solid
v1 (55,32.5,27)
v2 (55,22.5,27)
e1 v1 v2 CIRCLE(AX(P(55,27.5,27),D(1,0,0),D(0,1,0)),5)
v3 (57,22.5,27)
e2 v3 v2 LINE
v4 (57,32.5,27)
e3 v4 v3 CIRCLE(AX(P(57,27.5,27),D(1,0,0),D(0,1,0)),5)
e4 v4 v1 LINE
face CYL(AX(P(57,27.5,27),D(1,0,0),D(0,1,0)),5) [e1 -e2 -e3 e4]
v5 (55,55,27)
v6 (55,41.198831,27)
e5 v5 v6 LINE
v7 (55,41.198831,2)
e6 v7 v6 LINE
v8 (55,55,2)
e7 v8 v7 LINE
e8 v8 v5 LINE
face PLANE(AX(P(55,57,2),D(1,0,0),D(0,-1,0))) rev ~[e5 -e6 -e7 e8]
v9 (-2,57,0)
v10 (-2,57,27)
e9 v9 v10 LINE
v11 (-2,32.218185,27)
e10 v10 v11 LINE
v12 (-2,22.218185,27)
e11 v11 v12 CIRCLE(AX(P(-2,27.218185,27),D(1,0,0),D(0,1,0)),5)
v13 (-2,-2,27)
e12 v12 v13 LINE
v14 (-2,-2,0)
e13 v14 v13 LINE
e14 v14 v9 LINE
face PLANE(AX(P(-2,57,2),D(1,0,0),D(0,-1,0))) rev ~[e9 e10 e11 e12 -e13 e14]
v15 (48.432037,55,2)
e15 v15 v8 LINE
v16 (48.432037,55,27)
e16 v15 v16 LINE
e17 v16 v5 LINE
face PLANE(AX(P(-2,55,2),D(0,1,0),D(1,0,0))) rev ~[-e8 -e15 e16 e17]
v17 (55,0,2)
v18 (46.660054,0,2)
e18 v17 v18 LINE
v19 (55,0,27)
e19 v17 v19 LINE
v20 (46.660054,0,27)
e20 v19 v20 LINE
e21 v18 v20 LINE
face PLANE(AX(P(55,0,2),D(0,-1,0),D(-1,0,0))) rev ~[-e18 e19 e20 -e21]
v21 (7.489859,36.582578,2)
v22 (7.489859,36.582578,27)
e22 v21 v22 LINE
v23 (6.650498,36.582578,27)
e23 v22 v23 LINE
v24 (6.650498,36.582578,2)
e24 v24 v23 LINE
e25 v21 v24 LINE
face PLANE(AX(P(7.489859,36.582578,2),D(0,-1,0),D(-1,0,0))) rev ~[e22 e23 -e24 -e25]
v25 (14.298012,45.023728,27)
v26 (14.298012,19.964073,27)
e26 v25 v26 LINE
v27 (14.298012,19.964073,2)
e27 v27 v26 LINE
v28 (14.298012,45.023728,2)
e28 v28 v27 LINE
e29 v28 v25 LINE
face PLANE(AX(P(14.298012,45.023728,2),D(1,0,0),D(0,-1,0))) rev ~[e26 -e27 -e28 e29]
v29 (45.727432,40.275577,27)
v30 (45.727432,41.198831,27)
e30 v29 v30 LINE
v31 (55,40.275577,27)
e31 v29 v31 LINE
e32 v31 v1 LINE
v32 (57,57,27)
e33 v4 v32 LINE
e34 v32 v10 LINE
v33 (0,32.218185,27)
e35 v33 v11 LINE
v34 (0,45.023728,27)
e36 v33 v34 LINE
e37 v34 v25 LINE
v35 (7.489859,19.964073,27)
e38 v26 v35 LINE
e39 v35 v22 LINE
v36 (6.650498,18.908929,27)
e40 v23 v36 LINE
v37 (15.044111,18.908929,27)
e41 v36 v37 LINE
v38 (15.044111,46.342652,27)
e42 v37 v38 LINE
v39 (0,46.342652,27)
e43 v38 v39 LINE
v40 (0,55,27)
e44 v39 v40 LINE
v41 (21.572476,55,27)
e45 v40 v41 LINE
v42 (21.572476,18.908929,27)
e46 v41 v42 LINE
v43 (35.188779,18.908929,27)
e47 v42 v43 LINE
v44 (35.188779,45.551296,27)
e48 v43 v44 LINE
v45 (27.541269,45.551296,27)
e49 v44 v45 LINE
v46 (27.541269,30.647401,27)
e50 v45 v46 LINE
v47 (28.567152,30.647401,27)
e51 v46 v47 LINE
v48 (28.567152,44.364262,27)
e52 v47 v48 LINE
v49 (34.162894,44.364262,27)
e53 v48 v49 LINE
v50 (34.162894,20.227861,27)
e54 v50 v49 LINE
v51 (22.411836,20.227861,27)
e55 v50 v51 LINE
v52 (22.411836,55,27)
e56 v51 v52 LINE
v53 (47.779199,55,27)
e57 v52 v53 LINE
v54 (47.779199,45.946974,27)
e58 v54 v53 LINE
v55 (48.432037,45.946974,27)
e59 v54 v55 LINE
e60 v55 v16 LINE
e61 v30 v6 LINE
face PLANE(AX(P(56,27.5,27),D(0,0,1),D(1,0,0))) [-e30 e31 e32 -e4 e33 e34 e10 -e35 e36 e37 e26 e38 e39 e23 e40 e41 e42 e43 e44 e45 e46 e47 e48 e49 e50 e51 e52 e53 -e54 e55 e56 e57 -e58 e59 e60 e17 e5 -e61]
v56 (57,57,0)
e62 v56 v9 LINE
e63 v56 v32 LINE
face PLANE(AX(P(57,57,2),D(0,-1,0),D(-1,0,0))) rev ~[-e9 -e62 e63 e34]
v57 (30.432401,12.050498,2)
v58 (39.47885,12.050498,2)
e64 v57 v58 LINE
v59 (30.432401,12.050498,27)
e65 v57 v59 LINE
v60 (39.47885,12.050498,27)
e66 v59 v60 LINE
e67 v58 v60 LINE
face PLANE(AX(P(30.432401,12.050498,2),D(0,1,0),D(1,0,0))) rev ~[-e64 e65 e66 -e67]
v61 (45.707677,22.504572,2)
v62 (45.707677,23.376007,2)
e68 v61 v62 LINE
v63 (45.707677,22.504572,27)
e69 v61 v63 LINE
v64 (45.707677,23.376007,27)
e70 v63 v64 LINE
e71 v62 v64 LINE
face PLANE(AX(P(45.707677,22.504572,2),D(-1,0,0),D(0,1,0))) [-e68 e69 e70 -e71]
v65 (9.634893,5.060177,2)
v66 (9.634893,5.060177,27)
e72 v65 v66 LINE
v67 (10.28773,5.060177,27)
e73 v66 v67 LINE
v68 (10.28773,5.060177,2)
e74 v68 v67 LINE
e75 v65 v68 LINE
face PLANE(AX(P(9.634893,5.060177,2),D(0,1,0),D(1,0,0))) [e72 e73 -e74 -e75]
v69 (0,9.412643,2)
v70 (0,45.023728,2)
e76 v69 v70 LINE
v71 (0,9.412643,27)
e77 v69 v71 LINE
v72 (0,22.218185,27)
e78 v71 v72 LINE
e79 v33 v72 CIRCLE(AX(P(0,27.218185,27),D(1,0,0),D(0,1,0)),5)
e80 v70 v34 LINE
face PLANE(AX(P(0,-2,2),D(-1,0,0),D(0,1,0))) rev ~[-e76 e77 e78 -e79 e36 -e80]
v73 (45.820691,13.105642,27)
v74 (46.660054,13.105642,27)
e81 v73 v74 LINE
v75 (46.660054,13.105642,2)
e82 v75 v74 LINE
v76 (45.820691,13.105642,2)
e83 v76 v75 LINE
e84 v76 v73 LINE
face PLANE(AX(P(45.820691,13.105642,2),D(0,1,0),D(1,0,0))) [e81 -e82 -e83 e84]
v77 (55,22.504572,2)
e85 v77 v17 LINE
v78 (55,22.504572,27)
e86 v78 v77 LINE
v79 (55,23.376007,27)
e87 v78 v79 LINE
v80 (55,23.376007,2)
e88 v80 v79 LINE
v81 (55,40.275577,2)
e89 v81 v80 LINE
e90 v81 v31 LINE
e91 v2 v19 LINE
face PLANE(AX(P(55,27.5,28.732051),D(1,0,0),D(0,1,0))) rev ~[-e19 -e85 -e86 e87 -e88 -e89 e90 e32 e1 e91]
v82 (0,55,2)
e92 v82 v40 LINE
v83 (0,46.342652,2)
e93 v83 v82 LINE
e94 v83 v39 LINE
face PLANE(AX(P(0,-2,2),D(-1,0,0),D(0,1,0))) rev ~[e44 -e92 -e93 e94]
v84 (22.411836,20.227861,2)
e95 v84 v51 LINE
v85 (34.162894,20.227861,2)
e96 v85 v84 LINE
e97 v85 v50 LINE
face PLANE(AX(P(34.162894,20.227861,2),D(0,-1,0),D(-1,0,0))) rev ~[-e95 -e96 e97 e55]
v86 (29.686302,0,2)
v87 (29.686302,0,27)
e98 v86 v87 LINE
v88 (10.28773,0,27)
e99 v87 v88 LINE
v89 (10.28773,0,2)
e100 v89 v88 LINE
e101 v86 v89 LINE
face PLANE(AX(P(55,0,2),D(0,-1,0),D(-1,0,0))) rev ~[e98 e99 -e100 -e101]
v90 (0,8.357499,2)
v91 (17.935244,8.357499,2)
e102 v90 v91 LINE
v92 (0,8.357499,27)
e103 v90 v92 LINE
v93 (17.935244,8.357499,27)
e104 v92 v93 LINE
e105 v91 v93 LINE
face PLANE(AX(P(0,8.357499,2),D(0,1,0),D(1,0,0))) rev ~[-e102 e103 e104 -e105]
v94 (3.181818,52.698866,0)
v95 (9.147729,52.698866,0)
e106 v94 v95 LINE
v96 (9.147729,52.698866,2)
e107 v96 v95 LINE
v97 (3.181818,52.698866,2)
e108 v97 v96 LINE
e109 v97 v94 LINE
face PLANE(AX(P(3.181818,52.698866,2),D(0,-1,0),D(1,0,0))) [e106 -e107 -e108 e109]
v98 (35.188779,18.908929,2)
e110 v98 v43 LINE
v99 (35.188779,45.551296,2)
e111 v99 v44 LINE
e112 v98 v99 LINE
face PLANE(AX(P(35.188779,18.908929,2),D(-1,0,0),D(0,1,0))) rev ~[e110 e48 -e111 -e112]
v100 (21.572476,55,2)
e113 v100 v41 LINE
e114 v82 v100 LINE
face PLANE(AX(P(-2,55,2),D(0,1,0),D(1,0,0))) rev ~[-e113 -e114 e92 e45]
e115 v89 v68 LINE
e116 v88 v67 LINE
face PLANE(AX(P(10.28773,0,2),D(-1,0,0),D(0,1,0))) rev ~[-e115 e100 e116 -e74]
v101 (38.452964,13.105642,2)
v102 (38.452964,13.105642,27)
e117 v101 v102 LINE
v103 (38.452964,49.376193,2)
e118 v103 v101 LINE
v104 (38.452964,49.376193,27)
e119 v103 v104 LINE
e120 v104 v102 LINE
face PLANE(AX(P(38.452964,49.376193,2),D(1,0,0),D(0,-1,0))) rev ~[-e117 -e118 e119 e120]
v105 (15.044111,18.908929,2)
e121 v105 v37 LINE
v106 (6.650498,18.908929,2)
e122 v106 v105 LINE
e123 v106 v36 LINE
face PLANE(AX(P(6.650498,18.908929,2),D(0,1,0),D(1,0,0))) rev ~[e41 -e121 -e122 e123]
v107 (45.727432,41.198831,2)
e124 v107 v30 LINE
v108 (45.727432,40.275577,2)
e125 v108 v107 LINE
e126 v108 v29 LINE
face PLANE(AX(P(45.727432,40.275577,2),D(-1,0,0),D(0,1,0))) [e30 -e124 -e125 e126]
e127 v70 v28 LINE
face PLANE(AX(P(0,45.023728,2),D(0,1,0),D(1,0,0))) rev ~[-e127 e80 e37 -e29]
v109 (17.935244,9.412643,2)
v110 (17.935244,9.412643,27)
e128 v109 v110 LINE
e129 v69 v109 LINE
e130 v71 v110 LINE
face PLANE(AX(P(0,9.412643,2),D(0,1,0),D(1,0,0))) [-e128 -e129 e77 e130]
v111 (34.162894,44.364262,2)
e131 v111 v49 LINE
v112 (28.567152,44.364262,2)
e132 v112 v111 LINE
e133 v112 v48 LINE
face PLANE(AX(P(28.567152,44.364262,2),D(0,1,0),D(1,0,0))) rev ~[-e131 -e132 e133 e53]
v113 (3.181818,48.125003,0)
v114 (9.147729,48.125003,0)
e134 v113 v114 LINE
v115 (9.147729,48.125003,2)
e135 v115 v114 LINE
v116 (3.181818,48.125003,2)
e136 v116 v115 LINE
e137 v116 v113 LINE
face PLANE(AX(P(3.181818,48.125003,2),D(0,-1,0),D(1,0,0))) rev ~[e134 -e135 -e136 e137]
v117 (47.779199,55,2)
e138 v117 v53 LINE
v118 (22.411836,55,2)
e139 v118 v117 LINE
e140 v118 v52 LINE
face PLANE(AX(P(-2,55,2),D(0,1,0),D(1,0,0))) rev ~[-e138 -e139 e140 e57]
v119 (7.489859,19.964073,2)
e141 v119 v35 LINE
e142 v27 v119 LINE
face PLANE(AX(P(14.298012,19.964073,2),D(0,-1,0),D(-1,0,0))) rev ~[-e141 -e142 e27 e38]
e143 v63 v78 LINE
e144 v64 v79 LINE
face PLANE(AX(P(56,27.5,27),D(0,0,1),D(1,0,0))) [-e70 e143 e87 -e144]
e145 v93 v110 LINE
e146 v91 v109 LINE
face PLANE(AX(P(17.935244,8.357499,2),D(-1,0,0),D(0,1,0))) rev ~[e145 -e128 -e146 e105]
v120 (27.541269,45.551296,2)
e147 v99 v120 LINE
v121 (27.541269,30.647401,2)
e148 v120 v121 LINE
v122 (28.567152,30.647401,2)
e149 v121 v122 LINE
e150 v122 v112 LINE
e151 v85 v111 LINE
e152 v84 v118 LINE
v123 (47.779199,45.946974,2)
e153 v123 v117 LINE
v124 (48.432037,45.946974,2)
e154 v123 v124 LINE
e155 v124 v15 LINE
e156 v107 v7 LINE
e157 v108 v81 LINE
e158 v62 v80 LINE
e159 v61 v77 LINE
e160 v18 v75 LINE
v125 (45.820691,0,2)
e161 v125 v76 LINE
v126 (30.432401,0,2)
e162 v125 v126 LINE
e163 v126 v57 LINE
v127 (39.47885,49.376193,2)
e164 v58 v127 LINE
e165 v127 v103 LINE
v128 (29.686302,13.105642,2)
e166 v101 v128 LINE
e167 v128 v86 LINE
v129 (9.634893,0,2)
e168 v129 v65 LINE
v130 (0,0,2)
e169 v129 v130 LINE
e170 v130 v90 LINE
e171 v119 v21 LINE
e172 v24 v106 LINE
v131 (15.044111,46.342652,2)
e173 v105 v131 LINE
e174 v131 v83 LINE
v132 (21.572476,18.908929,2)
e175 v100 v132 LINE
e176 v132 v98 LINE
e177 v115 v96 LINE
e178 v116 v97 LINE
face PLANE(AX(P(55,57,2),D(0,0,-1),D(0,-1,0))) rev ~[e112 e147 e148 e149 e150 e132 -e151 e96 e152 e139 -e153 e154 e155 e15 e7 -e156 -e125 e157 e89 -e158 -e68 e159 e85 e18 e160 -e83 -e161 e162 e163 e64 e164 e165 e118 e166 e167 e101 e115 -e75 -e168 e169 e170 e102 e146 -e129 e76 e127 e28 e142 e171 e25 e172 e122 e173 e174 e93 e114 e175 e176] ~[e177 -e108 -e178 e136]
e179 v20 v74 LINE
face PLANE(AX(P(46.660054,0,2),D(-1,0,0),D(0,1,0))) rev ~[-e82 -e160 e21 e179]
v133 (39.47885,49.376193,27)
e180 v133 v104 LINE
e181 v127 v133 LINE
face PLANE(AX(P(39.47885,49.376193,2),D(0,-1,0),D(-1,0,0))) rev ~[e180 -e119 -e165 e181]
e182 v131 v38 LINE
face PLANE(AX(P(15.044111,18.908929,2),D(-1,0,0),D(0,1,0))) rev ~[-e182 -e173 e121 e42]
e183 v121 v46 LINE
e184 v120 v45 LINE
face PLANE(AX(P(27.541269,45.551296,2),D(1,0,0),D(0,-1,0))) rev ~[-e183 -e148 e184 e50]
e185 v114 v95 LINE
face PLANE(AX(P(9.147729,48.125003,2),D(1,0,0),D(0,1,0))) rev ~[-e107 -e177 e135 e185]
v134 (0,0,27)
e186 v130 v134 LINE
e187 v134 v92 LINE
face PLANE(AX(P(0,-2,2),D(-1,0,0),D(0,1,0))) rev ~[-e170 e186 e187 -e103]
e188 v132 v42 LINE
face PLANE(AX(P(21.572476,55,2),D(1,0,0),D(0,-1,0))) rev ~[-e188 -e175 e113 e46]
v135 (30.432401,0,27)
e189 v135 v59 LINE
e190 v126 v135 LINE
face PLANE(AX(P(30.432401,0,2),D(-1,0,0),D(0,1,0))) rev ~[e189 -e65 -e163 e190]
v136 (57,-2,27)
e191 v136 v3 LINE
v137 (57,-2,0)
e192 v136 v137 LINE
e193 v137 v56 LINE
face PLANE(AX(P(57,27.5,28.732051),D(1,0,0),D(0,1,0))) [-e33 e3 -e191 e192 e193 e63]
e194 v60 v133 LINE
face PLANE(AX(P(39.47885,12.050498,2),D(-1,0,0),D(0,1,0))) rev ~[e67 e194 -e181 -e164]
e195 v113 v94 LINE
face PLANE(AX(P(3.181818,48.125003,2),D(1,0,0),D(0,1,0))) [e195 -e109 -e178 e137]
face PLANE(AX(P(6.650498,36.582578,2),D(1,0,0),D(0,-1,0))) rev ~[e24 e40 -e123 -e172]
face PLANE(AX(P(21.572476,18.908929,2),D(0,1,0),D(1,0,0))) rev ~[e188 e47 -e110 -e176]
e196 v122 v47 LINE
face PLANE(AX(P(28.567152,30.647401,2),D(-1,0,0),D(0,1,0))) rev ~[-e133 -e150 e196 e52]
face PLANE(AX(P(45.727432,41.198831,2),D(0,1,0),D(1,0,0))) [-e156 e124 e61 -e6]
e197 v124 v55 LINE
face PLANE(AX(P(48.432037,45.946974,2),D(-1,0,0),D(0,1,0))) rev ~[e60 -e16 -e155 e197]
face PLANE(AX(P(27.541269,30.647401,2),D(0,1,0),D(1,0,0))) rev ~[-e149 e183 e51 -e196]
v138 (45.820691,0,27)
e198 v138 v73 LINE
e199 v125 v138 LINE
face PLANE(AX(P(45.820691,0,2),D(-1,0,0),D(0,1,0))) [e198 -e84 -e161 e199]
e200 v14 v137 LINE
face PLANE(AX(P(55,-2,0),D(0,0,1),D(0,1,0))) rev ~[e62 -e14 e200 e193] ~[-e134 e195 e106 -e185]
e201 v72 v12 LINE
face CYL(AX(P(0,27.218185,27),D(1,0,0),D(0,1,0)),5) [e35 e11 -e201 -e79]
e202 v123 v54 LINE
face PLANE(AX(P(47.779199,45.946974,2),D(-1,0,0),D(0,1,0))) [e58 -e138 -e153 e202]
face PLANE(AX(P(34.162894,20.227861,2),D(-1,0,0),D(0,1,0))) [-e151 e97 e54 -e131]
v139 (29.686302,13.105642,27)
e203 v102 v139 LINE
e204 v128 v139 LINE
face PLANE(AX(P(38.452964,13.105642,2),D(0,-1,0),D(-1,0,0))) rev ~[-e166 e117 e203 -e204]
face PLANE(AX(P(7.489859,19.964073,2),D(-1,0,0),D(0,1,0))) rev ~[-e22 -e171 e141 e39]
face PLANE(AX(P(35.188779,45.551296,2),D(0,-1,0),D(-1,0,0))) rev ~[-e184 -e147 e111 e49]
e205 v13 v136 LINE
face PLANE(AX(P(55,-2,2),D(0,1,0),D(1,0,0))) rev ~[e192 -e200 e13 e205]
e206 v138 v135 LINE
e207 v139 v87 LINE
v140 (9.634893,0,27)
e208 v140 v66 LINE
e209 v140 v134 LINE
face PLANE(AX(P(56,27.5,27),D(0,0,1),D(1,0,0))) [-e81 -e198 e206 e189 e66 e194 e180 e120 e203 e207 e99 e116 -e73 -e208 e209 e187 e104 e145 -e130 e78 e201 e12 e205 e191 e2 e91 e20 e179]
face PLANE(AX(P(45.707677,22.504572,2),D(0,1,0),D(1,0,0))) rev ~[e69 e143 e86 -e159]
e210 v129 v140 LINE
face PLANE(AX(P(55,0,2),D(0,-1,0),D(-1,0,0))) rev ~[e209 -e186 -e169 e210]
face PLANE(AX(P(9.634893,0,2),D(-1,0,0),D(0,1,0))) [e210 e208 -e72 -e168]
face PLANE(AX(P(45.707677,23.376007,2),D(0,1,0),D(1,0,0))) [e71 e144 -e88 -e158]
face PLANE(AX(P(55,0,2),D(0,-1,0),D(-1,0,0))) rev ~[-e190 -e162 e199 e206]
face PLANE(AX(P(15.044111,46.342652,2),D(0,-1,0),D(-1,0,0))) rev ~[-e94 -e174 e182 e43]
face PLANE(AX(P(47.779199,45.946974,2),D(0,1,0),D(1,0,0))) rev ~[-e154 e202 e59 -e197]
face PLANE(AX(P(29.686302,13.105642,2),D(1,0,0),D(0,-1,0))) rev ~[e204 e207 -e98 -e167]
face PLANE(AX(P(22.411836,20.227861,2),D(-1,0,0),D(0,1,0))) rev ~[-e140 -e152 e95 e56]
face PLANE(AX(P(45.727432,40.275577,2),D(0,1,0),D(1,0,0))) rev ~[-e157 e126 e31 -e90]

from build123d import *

# Parameters (mm, degrees)
F0_W      = 55
F0_H      = 55
F1_DEPTH  = 2
F2_W      = 0.8393637836
F2_H      = 13.1056420505
F2_W_2    = 14.2980124801
F2_H_2    = 1.318924129
F2_W_3    = 17.9352443665
F2_H_3    = 1.0551437736
F2_W_4    = 0.6528366357
F2_H_4    = 5.0601772964
F2_W_5    = 1.0258853436
F2_H_5    = 24.1364017129
F2_W_6    = 0.7460992783
F2_H_6    = 12.0504982769
F2_W_7    = 8.0205630511
F2_W_8    = 9.2725682259
F2_H_7    = 0.9232535958
F2_W_9    = 0.6528384984
F2_H_8    = 9.0530256927
F2_W_10   = 9.2923234403
F2_H_9    = 0.8714348078
F3_DEPTH  = 25
F5_DEPTH  = 2
F7_DEPTH  = 25
F8_W      = 57
F8_H      = 2
F9_DEPTH  = 2
F10_W     = 2
F10_H     = 57
F11_DEPTH = 25
F13_DEPTH = 2
F15_DEPTH = 25
F17_DEPTH = 2
F19_DEPTH = 25
F20_W     = 5.9659110848
F20_H     = 4.5738629997
F21_DEPTH = 25
F24_DEPTH = 2
F26_DEPTH = 2


with BuildPart() as f1:
    # F0 (on Top) → F1 (new body)
    with BuildSketch(Plane.XY):
        with Locations((27.5, 27.5)):
            Rectangle(F0_W, F0_H)
    extrude(amount=F1_DEPTH)

    # F2 (on face) → F3 (join)
    with BuildSketch(Plane.XY.offset(2)):
        with Locations((46.2403725833, 6.5528210253)):
            Rectangle(F2_W, F2_H)
        with Locations((7.1490062401, 45.6831902266)):
            Rectangle(F2_W_2, F2_H_2)
        Polygon((15.0441108271, 46.3426522911), (14.2980124801, 46.3426522911), (14.2980124801, 45.0237281621), (14.2980124801, 19.9640728533), (15.0441108271, 19.9640728533), align=None)
        Polygon((15.0441108271, 19.9640728533), (14.2980124801, 19.9640728533), (7.4898591265, 19.9640728533), (7.4898591265, 18.9089290798), (15.0441108271, 18.9089290798), align=None)
        Polygon((7.4898591265, 18.9089290798), (7.4898591265, 19.9640728533), (7.4898591265, 36.5825779736), (6.6504976712, 36.5825779736), (6.6504976712, 18.9089290798), align=None)
        with Locations((8.9676221833, 8.8850706816)):
            Rectangle(F2_W_3, F2_H_3)
        with Locations((9.9613117054, 2.5300886482)):
            Rectangle(F2_W_4, F2_H_4)
        Polygon((22.4118363112, 55), (21.5724762529, 55), (21.5724762529, 18.9089290798), (22.4118363112, 18.9089290798), (22.4118363112, 20.2278606594), align=None)
        Polygon((34.1628938913, 20.2278606594), (22.4118363112, 20.2278606594), (22.4118363112, 18.9089290798), (35.1887792349, 18.9089290798), (35.1887792349, 20.2278606594), align=None)
        with Locations((34.6758365631, 32.2960615158)):
            Rectangle(F2_W_5, F2_H_5)
        Polygon((28.5671520978, 44.3642623723), (34.1628938913, 44.3642623723), (35.1887792349, 44.3642623723), (35.1887792349, 45.5512963235), (28.5671520978, 45.5512963235), align=None)
        Polygon((28.5671520978, 30.6474007666), (28.5671520978, 44.3642623723), (28.5671520978, 45.5512963235), (27.5412686169, 45.5512963235), (27.5412686169, 30.6474007666), align=None)
        with Locations((30.0593515858, 6.0252491385)):
            Rectangle(F2_W_6, F2_H_6)
        with Locations((30.0593515858, 12.5780701637)):
            Rectangle(F2_W_6, F2_H_3)
        with Locations((34.4426827505, 12.5780701637)):
            Rectangle(F2_W_7, F2_H_3)
        Polygon((38.4529642761, 13.1056420505), (38.4529642761, 12.0504982769), (39.4788496196, 12.0504982769), (39.4788496196, 49.376193434), (38.4529642761, 49.376193434), align=None)
        with Locations((50.3637158871, 40.7372042537)):
            Rectangle(F2_W_8, F2_H_7)
        with Locations((48.1056179851, 50.4734871536)):
            Rectangle(F2_W_9, F2_H_8)
        with Locations((50.3538382798, 22.9402892292)):
            Rectangle(F2_W_10, F2_H_9)
    extrude(amount=F3_DEPTH)

    # F4 (on face) → F5 (join)
    with BuildSketch(Plane.XZ):
        Polygon((9.6348933876, 2), (0, 2), (0, 0), (55, 0), (55, 2), (46.6600544751, 2), (45.8206906915, 2), (30.432401225, 2), (29.6863019466, 2), (10.2877300233, 2), align=None)
    extrude(amount=F5_DEPTH)

    # F6 (on face) → F7 (join)
    with BuildSketch(Plane.XY.offset(2)):
        Polygon((9.6348933876, 0), (0, 0), (0, -2), (55, -2), (55, 0), (46.6600544751, 0), (45.8206906915, 0), (30.432401225, 0), (29.6863019466, 0), (10.2877300233, 0), align=None)
    extrude(amount=F7_DEPTH)

    # F8 (on face) → F9 (join)
    with BuildSketch(Plane(origin=(0, 0, 0), x_dir=(0, -1, 0), z_dir=(-1, 0, 0))):
        with Locations((-26.5, 1)):
            Rectangle(F8_W, F8_H)
    extrude(amount=F9_DEPTH)

    # F10 (on face) → F11 (join)
    with BuildSketch(Plane.XY.offset(2)):
        with Locations((-1, 26.5)):
            Rectangle(F10_W, F10_H)
    extrude(amount=F11_DEPTH)

    # F12 (on face) → F13 (join)
    with BuildSketch(Plane(origin=(0, 55, 0), x_dir=(-1, 0, 0), z_dir=(0, 1, 0))):
        Polygon((-55, 0), (2, 0), (2, 2), (0, 2), (-21.5724762529, 2), (-22.4118363112, 2), (-47.779198736, 2), (-48.4320372343, 2), (-55, 2), align=None)
    extrude(amount=F13_DEPTH)

    # F14 (on face) → F15 (join)
    with BuildSketch(Plane.XY.offset(2)):
        Polygon((55, 55), (55, 57), (-2, 57), (-2, 55), (0, 55), (21.5724762529, 55), (22.4118363112, 55), (47.779198736, 55), (48.4320372343, 55), align=None)
    extrude(amount=F15_DEPTH)

    # F16 (on face) → F17 (join)
    with BuildSketch(Plane.YZ.offset(55)):
        Polygon((-2, 2), (-2, 0), (57, 0), (57, 2), (55, 2), (41.1988310516, 2), (40.2755774558, 2), (23.376006633, 2), (22.5045718253, 2), (0, 2), align=None)
    extrude(amount=F17_DEPTH)

    # F18 (on face) → F19 (join)
    with BuildSketch(Plane.XY.offset(2)):
        Polygon((57, -2), (57, 57), (55, 57), (55, 55), (55, 41.1988310516), (55, 40.2755774558), (55, 23.376006633), (55, 22.5045718253), (55, 0), (55, -2), align=None)
    extrude(amount=F19_DEPTH)

    # F20 (on face) → F21 (cut)
    with BuildSketch(Plane.XY.offset(2)):
        with Locations((6.1647732509, 50.411934033)):
            Rectangle(F20_W, F20_H)
    extrude(amount=-F21_DEPTH, mode=Mode.SUBTRACT)

    # F23 (on face) → F24 (join, through all)
    with BuildSketch(Plane.YZ.offset(57)):
        with BuildLine():
            Line((22.5, 27), (32.5, 27))
            ThreePointArc((32.5, 27), (27.5, 32), (22.5, 27))
        make_face()
        with BuildLine():
            Line((57, 27), (32.5, 27))
            ThreePointArc((32.5, 27), (27.5, 22), (22.5, 27))
            Line((22.5, 27), (-2, 27))
            Line((-2, 27), (-2, 0))
            Line((-2, 0), (57, 0))
            Line((57, 0), (57, 27))
        make_face()
    extrude(amount=-F24_DEPTH)

    # F25 (on face) → F26 (join, through all)
    with BuildSketch(Plane.YZ):
        with BuildLine():
            Line((22.2181853652, 27), (32.2181853652, 27))
            ThreePointArc((32.2181853652, 27), (27.2181853652, 32), (22.2181853652, 27))
        make_face()
    extrude(amount=-F26_DEPTH)


solid = f1.part
